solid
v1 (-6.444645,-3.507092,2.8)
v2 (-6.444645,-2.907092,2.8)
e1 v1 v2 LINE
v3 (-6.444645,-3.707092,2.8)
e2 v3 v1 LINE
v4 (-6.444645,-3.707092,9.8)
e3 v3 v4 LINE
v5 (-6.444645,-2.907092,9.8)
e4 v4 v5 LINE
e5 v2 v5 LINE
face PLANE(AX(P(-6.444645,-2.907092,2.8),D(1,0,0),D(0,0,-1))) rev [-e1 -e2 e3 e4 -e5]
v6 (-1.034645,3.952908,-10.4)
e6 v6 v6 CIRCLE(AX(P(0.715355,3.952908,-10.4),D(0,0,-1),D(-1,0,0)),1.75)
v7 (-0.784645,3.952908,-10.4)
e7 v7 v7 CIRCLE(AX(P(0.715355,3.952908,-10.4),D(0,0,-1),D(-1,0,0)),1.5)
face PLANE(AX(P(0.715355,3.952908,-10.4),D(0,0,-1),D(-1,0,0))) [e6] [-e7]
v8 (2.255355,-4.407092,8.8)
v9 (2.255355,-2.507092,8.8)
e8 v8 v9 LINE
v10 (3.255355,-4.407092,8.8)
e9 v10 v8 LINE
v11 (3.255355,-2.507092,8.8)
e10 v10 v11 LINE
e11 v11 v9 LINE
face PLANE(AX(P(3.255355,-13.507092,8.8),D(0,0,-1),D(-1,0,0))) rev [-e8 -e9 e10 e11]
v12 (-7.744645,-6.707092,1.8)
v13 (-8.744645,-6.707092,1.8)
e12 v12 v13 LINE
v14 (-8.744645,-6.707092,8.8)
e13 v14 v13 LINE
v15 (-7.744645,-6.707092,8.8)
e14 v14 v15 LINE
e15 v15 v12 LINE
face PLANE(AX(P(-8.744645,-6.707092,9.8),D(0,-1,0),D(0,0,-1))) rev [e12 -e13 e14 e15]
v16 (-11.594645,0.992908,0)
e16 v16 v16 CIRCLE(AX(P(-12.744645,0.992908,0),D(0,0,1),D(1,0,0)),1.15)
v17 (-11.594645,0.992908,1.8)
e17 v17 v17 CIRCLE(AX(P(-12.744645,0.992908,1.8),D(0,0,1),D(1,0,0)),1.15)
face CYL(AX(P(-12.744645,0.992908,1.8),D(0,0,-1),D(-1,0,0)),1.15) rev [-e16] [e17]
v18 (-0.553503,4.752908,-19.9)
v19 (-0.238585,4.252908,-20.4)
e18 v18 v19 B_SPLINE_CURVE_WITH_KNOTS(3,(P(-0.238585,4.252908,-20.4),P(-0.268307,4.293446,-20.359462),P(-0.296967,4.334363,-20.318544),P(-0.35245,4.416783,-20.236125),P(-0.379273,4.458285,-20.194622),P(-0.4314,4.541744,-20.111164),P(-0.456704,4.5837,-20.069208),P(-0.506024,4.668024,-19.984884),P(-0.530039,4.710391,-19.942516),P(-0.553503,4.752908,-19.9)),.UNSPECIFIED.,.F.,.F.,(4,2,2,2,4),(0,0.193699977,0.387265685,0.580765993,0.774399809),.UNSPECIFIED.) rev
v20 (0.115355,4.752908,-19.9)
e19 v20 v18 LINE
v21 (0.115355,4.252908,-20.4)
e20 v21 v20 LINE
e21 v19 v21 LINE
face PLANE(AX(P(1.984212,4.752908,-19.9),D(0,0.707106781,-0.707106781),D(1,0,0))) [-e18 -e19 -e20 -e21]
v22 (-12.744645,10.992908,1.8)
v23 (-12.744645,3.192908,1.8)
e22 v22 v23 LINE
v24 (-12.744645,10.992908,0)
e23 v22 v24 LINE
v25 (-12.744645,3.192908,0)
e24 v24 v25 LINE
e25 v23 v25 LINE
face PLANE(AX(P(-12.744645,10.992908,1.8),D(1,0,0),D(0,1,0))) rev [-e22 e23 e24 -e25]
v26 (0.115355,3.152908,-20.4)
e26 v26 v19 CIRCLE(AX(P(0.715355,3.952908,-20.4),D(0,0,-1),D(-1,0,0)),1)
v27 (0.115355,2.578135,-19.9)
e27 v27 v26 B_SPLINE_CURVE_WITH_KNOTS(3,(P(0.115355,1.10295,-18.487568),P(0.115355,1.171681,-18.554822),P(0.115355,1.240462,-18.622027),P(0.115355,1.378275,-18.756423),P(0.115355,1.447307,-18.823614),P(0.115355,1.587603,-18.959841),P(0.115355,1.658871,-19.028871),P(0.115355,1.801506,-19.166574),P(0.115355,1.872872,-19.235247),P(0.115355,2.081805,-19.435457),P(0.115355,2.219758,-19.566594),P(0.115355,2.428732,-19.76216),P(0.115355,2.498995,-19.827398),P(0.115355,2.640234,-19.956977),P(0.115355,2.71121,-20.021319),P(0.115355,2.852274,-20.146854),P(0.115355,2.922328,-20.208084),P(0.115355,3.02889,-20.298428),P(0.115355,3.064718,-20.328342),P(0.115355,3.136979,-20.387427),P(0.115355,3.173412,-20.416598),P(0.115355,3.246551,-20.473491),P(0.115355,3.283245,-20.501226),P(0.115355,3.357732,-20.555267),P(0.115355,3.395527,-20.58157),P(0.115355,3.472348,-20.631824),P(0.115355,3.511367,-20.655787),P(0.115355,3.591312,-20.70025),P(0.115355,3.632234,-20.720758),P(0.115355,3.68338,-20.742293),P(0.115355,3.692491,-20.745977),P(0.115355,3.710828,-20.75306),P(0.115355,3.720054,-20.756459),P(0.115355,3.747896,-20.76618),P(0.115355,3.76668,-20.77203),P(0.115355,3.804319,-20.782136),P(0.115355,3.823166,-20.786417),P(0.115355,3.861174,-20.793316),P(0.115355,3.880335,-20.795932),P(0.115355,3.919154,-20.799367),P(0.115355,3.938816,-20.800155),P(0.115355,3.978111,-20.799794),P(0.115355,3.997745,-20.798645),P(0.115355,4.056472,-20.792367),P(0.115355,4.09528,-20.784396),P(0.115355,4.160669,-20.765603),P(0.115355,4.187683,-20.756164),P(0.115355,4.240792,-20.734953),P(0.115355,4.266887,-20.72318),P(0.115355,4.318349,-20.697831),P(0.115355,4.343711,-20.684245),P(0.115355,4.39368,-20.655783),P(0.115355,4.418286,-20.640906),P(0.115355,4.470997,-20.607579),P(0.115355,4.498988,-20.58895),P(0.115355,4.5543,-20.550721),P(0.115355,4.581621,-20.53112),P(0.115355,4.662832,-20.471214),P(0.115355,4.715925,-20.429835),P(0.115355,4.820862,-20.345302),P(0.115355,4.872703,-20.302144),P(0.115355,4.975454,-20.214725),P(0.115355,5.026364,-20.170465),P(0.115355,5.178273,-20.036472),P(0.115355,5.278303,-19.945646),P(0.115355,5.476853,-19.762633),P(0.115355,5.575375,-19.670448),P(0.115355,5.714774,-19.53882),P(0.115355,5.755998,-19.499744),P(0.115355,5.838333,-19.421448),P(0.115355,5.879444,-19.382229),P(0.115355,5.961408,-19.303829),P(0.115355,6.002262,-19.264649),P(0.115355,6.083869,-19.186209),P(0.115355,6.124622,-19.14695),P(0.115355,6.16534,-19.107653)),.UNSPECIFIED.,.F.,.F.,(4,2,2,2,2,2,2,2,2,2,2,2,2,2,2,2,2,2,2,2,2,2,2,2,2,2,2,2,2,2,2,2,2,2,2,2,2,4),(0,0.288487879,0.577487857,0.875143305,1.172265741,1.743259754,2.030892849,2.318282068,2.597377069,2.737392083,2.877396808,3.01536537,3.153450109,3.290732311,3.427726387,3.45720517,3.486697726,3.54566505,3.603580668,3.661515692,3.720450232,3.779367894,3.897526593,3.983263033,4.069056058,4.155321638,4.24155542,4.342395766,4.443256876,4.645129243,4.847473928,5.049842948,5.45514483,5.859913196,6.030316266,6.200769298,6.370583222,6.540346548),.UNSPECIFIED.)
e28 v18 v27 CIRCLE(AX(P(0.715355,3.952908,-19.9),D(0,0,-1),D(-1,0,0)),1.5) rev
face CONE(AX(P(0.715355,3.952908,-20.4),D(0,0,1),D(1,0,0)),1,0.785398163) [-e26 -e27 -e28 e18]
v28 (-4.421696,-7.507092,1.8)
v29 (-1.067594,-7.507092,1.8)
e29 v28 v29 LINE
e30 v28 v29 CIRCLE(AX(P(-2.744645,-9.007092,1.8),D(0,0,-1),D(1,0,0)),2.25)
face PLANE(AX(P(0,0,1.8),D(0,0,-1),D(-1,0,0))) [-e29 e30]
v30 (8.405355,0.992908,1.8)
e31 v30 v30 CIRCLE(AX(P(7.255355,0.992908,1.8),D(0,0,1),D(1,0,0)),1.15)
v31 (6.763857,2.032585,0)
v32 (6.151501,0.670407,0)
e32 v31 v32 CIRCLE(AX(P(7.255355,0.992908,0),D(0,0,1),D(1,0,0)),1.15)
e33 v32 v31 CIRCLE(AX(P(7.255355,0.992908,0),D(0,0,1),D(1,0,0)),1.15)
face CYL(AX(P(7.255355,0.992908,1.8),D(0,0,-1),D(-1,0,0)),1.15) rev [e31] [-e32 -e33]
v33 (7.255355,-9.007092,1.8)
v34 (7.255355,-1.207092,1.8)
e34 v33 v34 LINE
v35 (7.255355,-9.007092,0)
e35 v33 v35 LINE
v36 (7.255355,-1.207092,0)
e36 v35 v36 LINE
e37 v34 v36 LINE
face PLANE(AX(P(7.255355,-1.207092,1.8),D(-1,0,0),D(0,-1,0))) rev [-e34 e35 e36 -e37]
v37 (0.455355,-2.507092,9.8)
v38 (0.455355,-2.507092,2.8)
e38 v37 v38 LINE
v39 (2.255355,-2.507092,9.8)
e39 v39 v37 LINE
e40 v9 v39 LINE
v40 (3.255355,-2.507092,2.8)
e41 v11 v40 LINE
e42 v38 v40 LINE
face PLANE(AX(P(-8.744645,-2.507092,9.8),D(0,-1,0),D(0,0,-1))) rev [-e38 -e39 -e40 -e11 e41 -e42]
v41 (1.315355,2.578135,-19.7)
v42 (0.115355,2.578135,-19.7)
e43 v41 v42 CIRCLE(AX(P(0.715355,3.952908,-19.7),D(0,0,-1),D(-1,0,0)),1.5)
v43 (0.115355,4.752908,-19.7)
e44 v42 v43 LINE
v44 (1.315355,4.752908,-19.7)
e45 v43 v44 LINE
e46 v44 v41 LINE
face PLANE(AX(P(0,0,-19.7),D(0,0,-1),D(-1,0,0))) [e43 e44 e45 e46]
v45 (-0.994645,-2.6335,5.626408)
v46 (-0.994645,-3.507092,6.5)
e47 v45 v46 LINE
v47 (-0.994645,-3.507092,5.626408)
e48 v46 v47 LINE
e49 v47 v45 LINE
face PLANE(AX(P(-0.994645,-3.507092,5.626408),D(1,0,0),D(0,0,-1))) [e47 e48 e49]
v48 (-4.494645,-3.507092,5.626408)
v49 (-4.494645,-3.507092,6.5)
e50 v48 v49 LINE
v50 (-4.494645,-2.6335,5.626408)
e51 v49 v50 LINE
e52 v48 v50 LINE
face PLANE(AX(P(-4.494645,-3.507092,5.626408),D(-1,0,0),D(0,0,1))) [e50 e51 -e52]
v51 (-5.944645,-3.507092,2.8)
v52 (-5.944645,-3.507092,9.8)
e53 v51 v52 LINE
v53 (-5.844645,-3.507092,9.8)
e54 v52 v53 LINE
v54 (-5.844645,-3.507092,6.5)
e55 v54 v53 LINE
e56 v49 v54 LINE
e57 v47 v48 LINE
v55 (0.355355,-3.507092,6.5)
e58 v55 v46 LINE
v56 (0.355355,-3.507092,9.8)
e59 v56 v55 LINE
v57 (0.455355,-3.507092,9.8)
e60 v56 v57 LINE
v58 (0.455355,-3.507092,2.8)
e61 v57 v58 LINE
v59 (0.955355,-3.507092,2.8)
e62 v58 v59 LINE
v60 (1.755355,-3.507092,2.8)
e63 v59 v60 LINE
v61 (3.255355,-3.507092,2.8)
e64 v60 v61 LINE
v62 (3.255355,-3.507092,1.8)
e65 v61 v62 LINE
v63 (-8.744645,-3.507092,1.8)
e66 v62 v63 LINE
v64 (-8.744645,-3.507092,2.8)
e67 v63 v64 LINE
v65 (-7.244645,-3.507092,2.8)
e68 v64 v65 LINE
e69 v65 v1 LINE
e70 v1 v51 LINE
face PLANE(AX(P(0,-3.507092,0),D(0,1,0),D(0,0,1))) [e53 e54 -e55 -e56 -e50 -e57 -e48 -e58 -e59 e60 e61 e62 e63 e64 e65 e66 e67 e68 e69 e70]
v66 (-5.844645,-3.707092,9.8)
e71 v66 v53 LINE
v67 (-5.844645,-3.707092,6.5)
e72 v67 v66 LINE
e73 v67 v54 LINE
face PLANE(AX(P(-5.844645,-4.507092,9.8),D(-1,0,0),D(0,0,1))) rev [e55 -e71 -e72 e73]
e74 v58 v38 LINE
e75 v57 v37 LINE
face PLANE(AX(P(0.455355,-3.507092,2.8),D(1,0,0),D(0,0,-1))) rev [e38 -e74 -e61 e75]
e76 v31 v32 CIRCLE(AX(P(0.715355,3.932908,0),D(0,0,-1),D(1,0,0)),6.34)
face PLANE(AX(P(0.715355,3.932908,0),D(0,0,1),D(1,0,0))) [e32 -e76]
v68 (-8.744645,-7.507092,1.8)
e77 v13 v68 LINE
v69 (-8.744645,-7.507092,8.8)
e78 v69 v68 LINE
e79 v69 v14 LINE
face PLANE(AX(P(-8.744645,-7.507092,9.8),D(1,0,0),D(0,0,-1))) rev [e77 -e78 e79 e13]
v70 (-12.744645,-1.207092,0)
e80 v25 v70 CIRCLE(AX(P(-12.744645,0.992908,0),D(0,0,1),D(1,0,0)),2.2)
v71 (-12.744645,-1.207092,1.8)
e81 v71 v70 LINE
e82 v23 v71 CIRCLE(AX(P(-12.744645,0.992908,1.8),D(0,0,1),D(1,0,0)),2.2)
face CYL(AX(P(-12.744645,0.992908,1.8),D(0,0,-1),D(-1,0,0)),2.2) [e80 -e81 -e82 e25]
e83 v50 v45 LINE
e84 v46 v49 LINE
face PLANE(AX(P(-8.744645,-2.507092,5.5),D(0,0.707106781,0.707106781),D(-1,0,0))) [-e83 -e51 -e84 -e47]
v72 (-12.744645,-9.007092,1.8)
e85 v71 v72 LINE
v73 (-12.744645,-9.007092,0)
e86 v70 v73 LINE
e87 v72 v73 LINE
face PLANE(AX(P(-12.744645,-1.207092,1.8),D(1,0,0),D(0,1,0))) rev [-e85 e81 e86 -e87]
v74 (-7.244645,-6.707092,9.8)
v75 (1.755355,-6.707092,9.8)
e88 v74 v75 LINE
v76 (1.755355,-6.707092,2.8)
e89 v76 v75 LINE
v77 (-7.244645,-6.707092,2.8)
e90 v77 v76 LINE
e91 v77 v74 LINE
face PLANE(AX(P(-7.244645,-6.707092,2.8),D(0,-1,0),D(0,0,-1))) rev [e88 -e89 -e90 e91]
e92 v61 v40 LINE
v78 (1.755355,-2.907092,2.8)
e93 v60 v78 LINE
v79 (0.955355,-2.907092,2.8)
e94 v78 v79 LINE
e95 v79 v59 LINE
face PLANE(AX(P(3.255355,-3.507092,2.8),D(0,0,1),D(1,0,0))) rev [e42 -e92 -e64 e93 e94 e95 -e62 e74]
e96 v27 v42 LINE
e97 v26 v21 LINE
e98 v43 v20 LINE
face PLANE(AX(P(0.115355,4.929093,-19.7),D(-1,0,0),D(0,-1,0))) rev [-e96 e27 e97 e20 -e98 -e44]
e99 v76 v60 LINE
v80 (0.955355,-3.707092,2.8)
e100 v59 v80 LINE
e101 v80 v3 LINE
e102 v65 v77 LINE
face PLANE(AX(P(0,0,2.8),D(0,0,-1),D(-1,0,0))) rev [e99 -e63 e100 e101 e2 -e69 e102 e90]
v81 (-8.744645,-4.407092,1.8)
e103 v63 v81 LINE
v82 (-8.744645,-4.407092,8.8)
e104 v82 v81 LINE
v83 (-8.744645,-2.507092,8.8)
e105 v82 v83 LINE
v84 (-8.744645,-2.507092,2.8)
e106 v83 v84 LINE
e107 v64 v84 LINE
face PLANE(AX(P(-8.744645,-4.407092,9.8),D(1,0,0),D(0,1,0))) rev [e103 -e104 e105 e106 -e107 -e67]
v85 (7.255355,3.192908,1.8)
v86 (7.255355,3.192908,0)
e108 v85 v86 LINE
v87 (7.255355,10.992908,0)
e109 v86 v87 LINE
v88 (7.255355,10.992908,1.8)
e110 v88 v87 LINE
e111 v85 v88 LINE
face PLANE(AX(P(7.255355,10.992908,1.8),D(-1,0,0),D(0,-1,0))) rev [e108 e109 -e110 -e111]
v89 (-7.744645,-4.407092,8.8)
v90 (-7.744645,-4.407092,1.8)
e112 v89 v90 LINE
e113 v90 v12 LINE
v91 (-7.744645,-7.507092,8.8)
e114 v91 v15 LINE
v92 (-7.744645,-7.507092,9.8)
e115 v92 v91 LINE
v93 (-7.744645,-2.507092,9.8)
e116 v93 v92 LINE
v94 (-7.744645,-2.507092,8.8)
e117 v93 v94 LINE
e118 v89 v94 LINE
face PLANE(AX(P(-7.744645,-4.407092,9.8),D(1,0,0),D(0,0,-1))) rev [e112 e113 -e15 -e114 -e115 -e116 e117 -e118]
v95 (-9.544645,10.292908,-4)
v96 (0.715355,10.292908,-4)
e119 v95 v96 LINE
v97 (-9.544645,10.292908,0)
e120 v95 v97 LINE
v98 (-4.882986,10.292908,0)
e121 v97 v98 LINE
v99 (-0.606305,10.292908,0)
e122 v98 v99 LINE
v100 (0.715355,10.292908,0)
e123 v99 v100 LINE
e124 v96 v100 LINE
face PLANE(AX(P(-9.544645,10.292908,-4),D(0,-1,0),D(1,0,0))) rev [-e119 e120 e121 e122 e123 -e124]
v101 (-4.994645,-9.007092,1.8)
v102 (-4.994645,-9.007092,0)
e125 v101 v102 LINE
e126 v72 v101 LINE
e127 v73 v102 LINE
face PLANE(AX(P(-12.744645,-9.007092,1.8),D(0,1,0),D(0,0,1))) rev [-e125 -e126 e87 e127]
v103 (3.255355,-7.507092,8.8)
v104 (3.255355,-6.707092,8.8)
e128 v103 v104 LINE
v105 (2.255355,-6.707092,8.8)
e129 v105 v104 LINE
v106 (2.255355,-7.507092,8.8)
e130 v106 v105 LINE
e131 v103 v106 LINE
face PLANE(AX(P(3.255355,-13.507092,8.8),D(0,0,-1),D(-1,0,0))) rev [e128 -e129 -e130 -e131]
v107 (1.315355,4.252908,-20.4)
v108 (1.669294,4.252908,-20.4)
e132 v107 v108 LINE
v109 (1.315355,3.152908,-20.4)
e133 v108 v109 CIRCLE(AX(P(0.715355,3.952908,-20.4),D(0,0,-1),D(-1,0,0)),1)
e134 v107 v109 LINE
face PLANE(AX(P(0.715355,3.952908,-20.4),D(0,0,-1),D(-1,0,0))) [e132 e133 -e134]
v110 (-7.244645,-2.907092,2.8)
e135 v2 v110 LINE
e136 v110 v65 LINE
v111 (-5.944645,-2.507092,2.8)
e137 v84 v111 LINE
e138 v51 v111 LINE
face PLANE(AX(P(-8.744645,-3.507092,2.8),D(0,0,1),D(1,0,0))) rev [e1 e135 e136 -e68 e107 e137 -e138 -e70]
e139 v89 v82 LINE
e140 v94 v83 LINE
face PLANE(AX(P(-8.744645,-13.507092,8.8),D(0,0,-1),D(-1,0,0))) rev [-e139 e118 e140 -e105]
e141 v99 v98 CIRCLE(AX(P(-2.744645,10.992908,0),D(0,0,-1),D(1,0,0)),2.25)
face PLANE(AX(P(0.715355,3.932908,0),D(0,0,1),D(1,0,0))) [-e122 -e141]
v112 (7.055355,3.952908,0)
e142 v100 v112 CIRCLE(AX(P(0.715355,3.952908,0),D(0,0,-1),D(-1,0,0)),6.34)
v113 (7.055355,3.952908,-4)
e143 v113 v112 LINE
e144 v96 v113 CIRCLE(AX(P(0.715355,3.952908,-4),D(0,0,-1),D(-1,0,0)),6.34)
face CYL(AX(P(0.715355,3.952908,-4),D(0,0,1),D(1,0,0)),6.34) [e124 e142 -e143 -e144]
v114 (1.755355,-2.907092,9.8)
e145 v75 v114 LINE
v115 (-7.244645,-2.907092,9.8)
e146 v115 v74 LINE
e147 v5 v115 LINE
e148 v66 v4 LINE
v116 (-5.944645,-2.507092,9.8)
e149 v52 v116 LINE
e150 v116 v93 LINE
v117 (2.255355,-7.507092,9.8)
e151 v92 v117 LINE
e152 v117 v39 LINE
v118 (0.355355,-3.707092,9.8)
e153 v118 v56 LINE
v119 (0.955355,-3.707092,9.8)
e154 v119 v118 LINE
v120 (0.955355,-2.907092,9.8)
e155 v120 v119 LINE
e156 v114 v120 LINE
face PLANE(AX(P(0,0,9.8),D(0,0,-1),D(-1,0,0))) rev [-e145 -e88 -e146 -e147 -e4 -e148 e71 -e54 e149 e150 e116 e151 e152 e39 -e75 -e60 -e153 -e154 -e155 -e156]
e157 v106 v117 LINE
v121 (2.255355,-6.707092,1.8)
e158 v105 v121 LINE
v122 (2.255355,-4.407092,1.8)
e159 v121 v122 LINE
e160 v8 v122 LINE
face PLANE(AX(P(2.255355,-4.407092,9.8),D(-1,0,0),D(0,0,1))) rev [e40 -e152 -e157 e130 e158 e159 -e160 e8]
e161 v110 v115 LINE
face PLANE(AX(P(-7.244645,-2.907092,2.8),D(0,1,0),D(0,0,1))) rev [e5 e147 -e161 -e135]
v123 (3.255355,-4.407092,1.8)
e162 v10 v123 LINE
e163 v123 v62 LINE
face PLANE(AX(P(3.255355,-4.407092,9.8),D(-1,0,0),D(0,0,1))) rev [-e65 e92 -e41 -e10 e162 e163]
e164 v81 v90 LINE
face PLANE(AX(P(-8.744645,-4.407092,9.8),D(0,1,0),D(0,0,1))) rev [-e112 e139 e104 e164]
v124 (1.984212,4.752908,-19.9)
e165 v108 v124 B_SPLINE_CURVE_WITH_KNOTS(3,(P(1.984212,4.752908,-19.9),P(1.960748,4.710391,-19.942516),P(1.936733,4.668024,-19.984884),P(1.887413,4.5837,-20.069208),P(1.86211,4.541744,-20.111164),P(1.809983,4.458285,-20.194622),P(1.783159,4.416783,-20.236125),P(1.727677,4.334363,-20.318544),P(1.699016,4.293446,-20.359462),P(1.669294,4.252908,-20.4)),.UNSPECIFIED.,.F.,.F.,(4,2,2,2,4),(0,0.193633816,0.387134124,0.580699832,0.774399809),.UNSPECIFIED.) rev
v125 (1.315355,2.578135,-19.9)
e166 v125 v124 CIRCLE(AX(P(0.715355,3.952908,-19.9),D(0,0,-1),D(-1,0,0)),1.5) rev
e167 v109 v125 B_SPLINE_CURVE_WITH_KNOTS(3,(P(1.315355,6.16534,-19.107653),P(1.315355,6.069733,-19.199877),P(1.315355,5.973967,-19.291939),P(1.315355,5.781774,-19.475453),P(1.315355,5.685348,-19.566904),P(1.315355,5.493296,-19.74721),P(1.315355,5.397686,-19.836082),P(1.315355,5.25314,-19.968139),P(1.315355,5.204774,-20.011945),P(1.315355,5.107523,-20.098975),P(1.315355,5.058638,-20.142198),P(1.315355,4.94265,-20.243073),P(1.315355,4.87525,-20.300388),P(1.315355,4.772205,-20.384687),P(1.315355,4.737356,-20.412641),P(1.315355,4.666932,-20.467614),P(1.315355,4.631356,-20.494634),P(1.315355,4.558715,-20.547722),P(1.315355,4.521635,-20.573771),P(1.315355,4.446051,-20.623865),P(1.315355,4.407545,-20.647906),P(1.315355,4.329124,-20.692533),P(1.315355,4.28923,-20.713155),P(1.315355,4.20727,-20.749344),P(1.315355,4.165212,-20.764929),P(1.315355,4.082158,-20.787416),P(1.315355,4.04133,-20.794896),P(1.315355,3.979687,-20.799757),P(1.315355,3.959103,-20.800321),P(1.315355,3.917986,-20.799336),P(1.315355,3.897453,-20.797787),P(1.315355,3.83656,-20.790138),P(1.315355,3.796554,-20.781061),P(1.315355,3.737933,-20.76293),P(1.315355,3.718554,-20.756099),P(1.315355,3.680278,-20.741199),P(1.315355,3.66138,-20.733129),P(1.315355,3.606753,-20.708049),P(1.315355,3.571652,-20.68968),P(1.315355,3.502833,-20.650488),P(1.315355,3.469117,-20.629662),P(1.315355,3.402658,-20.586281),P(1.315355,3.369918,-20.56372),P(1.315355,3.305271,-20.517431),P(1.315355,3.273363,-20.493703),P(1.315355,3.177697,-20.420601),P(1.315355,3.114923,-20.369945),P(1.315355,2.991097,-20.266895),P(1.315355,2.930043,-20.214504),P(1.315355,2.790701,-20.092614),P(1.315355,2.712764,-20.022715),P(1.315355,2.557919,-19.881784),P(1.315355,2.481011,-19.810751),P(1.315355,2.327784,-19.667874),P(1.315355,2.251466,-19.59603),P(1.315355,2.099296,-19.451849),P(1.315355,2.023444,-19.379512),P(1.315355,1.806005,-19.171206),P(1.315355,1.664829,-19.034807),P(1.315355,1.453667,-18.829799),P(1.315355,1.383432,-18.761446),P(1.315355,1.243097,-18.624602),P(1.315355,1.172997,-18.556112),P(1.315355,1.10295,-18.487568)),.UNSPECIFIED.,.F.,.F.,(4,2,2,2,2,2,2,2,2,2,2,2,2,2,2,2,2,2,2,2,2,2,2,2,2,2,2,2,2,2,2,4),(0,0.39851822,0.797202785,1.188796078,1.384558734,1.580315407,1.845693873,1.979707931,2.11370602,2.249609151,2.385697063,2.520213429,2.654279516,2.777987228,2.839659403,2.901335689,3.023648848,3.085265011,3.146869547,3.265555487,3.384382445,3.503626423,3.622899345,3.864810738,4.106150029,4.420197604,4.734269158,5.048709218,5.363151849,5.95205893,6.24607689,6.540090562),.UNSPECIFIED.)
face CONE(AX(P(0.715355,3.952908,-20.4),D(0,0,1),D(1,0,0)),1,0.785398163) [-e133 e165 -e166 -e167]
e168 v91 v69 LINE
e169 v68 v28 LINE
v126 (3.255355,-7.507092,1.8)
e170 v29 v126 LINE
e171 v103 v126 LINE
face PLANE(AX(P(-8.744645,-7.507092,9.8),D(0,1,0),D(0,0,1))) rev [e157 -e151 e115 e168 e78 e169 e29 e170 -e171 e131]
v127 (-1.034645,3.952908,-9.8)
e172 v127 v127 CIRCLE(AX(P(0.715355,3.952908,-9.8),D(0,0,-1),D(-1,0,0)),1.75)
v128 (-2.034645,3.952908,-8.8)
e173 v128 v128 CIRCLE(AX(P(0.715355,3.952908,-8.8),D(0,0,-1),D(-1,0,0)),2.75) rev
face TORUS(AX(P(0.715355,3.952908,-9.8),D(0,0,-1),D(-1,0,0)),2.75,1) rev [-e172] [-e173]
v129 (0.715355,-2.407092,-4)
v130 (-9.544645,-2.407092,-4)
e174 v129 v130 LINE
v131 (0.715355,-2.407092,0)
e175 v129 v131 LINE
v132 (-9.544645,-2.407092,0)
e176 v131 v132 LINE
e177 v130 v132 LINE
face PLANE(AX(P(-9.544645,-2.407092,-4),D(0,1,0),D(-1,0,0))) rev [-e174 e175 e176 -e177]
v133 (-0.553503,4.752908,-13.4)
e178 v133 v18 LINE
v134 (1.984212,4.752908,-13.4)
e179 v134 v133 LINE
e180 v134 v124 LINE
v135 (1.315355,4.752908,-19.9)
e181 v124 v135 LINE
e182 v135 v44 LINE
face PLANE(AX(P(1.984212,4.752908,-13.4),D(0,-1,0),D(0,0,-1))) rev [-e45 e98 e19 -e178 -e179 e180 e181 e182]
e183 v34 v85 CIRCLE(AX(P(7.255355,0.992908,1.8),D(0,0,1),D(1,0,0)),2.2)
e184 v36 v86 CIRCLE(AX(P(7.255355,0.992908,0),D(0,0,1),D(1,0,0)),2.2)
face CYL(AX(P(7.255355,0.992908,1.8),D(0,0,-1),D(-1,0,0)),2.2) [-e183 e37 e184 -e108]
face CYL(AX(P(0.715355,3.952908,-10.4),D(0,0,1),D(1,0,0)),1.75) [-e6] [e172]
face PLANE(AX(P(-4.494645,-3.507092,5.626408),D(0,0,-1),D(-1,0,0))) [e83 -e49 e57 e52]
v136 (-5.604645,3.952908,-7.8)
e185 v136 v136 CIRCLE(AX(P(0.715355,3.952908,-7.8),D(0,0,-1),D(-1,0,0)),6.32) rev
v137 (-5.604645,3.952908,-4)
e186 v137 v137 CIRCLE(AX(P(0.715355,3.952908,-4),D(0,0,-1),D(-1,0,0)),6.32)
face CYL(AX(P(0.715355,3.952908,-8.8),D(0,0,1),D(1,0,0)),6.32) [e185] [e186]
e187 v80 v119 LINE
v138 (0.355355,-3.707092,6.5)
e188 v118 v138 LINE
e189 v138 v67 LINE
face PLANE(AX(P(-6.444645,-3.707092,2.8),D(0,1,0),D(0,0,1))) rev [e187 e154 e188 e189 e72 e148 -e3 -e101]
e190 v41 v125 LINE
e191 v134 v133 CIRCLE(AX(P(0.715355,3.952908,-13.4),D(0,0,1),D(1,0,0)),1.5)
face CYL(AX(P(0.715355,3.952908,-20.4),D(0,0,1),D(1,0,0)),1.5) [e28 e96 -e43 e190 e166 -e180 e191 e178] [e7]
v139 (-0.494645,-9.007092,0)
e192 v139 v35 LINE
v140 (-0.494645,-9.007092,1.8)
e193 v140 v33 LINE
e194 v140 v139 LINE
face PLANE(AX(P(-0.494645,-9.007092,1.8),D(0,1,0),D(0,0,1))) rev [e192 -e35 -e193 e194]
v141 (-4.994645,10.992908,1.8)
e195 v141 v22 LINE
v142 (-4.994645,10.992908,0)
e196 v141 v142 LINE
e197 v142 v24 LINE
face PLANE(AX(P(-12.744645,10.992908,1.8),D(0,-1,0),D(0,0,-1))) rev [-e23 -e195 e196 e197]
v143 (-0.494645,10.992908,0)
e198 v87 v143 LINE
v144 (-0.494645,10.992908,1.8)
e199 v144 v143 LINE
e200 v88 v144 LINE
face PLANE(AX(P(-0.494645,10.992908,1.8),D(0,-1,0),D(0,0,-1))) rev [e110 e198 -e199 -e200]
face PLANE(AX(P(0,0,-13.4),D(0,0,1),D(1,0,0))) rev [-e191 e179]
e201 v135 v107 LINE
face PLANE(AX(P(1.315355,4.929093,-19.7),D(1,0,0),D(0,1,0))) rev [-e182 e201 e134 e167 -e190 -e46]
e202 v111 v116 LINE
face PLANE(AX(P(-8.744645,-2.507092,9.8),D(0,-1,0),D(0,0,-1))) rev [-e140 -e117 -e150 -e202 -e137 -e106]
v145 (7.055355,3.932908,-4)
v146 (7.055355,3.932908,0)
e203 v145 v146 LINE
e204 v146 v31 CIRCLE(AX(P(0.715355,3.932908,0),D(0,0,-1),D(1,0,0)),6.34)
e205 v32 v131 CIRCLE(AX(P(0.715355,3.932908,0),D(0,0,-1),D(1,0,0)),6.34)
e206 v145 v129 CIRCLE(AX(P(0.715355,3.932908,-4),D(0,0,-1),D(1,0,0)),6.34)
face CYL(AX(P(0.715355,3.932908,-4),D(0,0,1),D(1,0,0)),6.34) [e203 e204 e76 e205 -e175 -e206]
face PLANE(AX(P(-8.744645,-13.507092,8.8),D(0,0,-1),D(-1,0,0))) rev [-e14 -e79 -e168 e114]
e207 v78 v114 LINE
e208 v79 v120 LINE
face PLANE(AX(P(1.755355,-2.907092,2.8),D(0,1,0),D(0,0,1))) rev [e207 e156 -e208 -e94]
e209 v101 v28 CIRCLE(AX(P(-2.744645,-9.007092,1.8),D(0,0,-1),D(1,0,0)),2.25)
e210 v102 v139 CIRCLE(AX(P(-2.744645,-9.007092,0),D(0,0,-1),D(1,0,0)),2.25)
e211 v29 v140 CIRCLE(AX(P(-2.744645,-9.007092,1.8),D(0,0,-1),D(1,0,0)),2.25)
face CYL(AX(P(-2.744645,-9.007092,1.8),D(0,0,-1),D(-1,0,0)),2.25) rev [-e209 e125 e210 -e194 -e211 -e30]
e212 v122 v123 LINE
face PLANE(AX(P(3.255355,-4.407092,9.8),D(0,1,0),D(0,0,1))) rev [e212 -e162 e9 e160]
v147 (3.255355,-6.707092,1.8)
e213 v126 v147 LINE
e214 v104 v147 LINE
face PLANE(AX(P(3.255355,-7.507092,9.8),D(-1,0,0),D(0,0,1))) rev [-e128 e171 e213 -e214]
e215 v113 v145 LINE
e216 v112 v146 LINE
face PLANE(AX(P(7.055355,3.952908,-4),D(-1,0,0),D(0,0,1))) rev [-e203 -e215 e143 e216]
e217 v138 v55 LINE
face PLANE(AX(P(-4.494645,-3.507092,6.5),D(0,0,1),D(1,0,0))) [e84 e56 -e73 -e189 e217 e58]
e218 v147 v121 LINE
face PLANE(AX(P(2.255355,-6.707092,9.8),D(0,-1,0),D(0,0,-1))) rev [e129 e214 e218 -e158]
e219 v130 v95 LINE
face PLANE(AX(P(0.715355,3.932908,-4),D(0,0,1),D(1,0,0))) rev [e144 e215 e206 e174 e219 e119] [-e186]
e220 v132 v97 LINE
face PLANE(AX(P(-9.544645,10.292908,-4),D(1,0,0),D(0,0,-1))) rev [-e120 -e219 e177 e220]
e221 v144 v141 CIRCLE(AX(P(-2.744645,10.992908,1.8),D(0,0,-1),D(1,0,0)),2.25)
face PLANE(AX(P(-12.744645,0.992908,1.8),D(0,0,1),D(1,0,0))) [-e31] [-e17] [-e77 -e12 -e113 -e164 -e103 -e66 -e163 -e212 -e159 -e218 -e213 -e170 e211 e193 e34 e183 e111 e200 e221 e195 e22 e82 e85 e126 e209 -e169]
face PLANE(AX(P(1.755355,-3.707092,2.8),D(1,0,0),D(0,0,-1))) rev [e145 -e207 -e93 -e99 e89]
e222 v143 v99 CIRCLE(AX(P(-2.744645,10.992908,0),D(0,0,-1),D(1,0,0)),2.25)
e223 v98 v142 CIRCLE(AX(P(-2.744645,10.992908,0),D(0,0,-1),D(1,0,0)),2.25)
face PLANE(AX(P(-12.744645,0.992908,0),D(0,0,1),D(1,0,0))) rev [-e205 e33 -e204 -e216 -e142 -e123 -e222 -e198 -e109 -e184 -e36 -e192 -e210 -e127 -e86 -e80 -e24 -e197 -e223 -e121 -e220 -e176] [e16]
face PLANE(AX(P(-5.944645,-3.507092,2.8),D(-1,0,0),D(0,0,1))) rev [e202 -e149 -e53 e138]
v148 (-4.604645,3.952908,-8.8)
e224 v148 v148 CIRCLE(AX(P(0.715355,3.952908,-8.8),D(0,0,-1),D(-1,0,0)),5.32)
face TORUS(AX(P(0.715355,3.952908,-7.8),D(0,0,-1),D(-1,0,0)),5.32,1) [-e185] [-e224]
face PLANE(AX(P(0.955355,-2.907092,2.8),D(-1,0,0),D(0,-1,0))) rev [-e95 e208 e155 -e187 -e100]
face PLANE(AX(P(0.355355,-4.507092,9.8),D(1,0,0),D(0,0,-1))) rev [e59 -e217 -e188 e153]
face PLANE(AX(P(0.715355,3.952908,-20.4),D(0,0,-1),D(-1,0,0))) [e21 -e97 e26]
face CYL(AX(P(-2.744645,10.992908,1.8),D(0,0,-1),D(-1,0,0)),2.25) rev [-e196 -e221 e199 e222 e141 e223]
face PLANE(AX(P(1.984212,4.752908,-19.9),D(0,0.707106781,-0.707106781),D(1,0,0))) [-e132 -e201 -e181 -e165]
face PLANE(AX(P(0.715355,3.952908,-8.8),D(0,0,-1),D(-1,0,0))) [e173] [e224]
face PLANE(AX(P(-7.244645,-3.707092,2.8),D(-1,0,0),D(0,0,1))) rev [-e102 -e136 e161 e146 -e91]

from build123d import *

# Parameters (mm, degrees)
ESQUISSE1_R             = 1.15
BOSS_EXTRU_1_DEPTH      = 1.8
BOSS_EXTRU_2_DEPTH      = 8
ENL_V_MAT_EXTRU_1_DEPTH = 7
ESQUISSE4_W             = 3.5
ESQUISSE4_H             = 0.873592076
ENL_V_MAT_EXTRU_2_DEPTH = 1
ESQUISSE5_W             = 1
ESQUISSE5_H             = 1
ENL_V_MAT_EXTRU_3_DEPTH = 11
ESQUISSE6_W             = 6.2
ESQUISSE6_H             = 3.3
ENL_V_MAT_EXTRU_4_DEPTH = 1
CHANFREIN1_SIZE         = 1
BOSS_EXTRU_3_DEPTH      = 4
ESQUISSE8_R             = 6.32
BOSS_EXTRU_4_DEPTH      = 4.8
CONG_1_R                = 1
ESQUISSE10_R            = 1.75
BOSS_EXTRU_5_DEPTH      = 1.6
CONG_2_R                = 1
ESQUISSE11_R            = 1.5
BOSS_EXTRU_6_DEPTH      = 10
ESQUISSE12_W            = 2.890262719
ESQUISSE12_H            = 1.095500593
ENL_V_MAT_EXTRU_7_DEPTH = 7
CHANFREIN2_SIZE         = 0.5
ESQUISSE13_W            = 1.2
ESQUISSE13_H            = 2.827300788
ENL_V_MAT_EXTRU_8_DEPTH = 0.7


with BuildPart() as part:
    # Esquisse1 → Boss.-Extru.1 (new body)
    with BuildSketch(Plane.XY):
        with BuildLine():
            Line((-12.744645331, 10.992907801), (-4.994645331, 10.992907801))
            ThreePointArc((-4.994645331, 10.992907801), (-2.744645331, 8.742907801), (-0.494645331, 10.992907801))
            Line((-0.494645331, 10.992907801), (7.255354669, 10.992907801))
            Line((7.255354669, 10.992907801), (7.255354669, 3.192907801))
            ThreePointArc((7.255354669, 3.192907801), (9.455354669, 0.992907801), (7.255354669, -1.207092199))
            Line((7.255354669, -1.207092199), (7.255354669, -9.007092199))
            Line((7.255354669, -9.007092199), (-0.494645331, -9.007092199))
            ThreePointArc((-0.494645331, -9.007092199), (-2.744645331, -6.757092199), (-4.994645331, -9.007092199))
            Line((-4.994645331, -9.007092199), (-12.744645331, -9.007092199))
            Line((-12.744645331, -9.007092199), (-12.744645331, -1.207092199))
            ThreePointArc((-12.744645331, -1.207092199), (-14.944645331, 0.992907801), (-12.744645331, 3.192907801))
            Line((-12.744645331, 3.192907801), (-12.744645331, 10.992907801))
        make_face()
        with Locations((-12.744645331, 0.992907801)):
            Circle(ESQUISSE1_R, mode=Mode.SUBTRACT)
        with Locations((7.255354669, 0.992907801)):
            Circle(ESQUISSE1_R, mode=Mode.SUBTRACT)
    extrude(amount=BOSS_EXTRU_1_DEPTH)

    # Esquisse2 → Boss.-Extru.2 (add)
    with BuildSketch(Plane.XY.offset(1.8)):
        Polygon((-8.744645331, -7.507092199), (3.255354669, -7.507092199), (3.255354669, -6.707092199), (2.255354669, -6.707092199), (2.255354669, -4.407092199), (3.255354669, -4.407092199), (3.255354669, -2.507092199), (-8.744645331, -2.507092199), (-8.744645331, -4.407092199), (-7.744645331, -4.407092199), (-7.744645331, -6.707092199), (-8.744645331, -6.707092199), align=None)
    extrude(amount=BOSS_EXTRU_2_DEPTH)

    # Esquisse3 → Enlèv. mat.-Extru.1 (cut)
    with BuildSketch(Plane.XY.offset(9.8)):
        Polygon((-6.444645331, -3.707092199), (0.955354669, -3.707092199), (0.955354669, -2.907092199), (1.755354669, -2.907092199), (1.755354669, -3.707092199), (1.755354669, -6.707092199), (-7.244645331, -6.707092199), (-7.244645331, -3.707092199), (-7.244645331, -2.907092199), (-6.444645331, -2.907092199), align=None)
    extrude(amount=-ENL_V_MAT_EXTRU_1_DEPTH, mode=Mode.SUBTRACT)

    # Esquisse4 → Enlèv. mat.-Extru.2 (cut)
    with BuildSketch(Plane(origin=(0, -2.507092199, 0), x_dir=(1, 0, 0), z_dir=(0, 1, 0))):
        Polygon((-8.744645331, -1.8), (3.255354669, -1.8), (3.255354669, -2.8), (0.455354669, -2.8), (0.455354669, -9.8), (-5.944645331, -9.8), (-5.944645331, -2.8), (-8.744645331, -2.8), align=None)
        with Locations((-2.744645331, -6.063203962)):
            Rectangle(ESQUISSE4_W, ESQUISSE4_H, mode=Mode.SUBTRACT)
    extrude(amount=-ENL_V_MAT_EXTRU_2_DEPTH, mode=Mode.SUBTRACT)

    # Esquisse5 → Enlèv. mat.-Extru.3 (cut)
    with BuildSketch(Plane(origin=(0, -2.507092199, 0), x_dir=(1, 0, 0), z_dir=(0, 1, 0))):
        with Locations((-8.244645331, -9.3)):
            Rectangle(ESQUISSE5_W, ESQUISSE5_H)
        with Locations((2.755354669, -9.3)):
            Rectangle(ESQUISSE5_W, ESQUISSE5_H)
    extrude(amount=-ENL_V_MAT_EXTRU_3_DEPTH, mode=Mode.SUBTRACT)

    # Esquisse6 → Enlèv. mat.-Extru.4 (cut)
    with BuildSketch(Plane(origin=(0, -3.507092199, 0), x_dir=(1, 0, 0), z_dir=(0, 1, 0))):
        with Locations((-2.744645331, -8.15)):
            Rectangle(ESQUISSE6_W, ESQUISSE6_H)
    extrude(amount=-ENL_V_MAT_EXTRU_4_DEPTH, mode=Mode.SUBTRACT)

    # Chanfrein1
    # the kernel refuses this chamfer: 1 mm, written as the material it takes off along each edge
    with BuildSketch(Plane(origin=(1.577037657, -2.507092199, 6.5), x_dir=(0, -0.9996219169112968, 0.027495876610586487), z_dir=(-1, 0, 0))) as chanfrein1_piece_1_section:
        Polygon((CHANFREIN1_SIZE * 0.999621916911, -CHANFREIN1_SIZE * 0.0274958766106), (-CHANFREIN1_SIZE * 0.0274958766106, -CHANFREIN1_SIZE * 0.999621916911), (0, 0), align=None)
    chanfrein1_piece_1 = extrude(amount=6.071682988, mode=Mode.PRIVATE)
    chanfrein1_piece_1 = split(chanfrein1_piece_1, bisect_by=Plane(origin=(0.455354669, -3.107092199, 6.3), z_dir=(-1, 0, 0)), keep=Keep.TOP, mode=Mode.PRIVATE)
    add(chanfrein1_piece_1, mode=Mode.SUBTRACT)

    # Esquisse7 → Boss.-Extru.3 (add)
    with BuildSketch(Plane(origin=(0, 0, 0), x_dir=(-1, 0, 0), z_dir=(0, 0, -1))):
        with BuildLine():
            Line((9.544645331, 10.292907801), (-0.715354669, 10.292907801))
            ThreePointArc((-0.715354669, 10.292907801), (-5.198411662, 8.435964794), (-7.055354669, 3.952907801))
            Line((-7.055354669, 3.952907801), (-7.055354669, 3.932907801))
            ThreePointArc((-7.055354669, 3.932907801), (-5.198411662, -0.550149191), (-0.715354669, -2.407092199))
            Line((-0.715354669, -2.407092199), (9.544645331, -2.407092199))
            Line((9.544645331, -2.407092199), (9.544645331, 10.292907801))
        make_face()
    extrude(amount=BOSS_EXTRU_3_DEPTH)

    # Esquisse8 → Boss.-Extru.4 (add)
    with BuildSketch(Plane(origin=(0, 0, -4), x_dir=(-1, 0, 0), z_dir=(0, 0, -1))):
        with Locations((-0.715354669, 3.952907801)):
            Circle(ESQUISSE8_R)
    extrude(amount=BOSS_EXTRU_4_DEPTH)

    # Congé1
    cong_1_edges = [part.edges().sort_by_distance(p)[0] for p in [
        (7.035354669, 3.952907801, -8.8),
    ]]
    fillet(cong_1_edges, radius=CONG_1_R)

    # Esquisse10 → Boss.-Extru.5 (add)
    with BuildSketch(Plane(origin=(0, 0, -8.8), x_dir=(-1, 0, 0), z_dir=(0, 0, -1))):
        with Locations((-0.715354669, 3.952907801)):
            Circle(ESQUISSE10_R)
    extrude(amount=BOSS_EXTRU_5_DEPTH)

    # Congé2
    cong_2_edges = [part.edges().sort_by_distance(p)[0] for p in [
        (2.465354669, 3.952907801, -8.8),
    ]]
    fillet(cong_2_edges, radius=CONG_2_R)

    # Esquisse11 → Boss.-Extru.6 (add)
    with BuildSketch(Plane(origin=(0, 0, -10.4), x_dir=(-1, 0, 0), z_dir=(0, 0, -1))):
        with Locations((-0.715354669, 3.952907801)):
            Circle(ESQUISSE11_R)
    extrude(amount=BOSS_EXTRU_6_DEPTH)

    # Esquisse12 → Enlèv. mat.-Extru.7 (cut)
    with BuildSketch(Plane(origin=(0, 0, -20.4), x_dir=(-1, 0, 0), z_dir=(0, 0, -1))):
        with Locations((-0.539081064, 5.300658098)):
            Rectangle(ESQUISSE12_W, ESQUISSE12_H)
    extrude(amount=-ENL_V_MAT_EXTRU_7_DEPTH, mode=Mode.SUBTRACT)

    # Chanfrein2
    chanfrein2_edges = [part.edges().sort_by_distance(p)[0] for p in [
        (1.131715912, 2.511851482, -20.4),
        (0.715354669, 4.752907801, -20.4),
    ]]
    chamfer(chanfrein2_edges, length=CHANFREIN2_SIZE)

    # Esquisse13 → Enlèv. mat.-Extru.8 (cut)
    with BuildSketch(Plane(origin=(0, 0, -20.4), x_dir=(-1, 0, 0), z_dir=(0, 0, -1))):
        with Locations((-0.715354669, 3.515442174)):
            Rectangle(ESQUISSE13_W, ESQUISSE13_H)
    extrude(amount=-ENL_V_MAT_EXTRU_8_DEPTH, mode=Mode.SUBTRACT)


solid = part.part
